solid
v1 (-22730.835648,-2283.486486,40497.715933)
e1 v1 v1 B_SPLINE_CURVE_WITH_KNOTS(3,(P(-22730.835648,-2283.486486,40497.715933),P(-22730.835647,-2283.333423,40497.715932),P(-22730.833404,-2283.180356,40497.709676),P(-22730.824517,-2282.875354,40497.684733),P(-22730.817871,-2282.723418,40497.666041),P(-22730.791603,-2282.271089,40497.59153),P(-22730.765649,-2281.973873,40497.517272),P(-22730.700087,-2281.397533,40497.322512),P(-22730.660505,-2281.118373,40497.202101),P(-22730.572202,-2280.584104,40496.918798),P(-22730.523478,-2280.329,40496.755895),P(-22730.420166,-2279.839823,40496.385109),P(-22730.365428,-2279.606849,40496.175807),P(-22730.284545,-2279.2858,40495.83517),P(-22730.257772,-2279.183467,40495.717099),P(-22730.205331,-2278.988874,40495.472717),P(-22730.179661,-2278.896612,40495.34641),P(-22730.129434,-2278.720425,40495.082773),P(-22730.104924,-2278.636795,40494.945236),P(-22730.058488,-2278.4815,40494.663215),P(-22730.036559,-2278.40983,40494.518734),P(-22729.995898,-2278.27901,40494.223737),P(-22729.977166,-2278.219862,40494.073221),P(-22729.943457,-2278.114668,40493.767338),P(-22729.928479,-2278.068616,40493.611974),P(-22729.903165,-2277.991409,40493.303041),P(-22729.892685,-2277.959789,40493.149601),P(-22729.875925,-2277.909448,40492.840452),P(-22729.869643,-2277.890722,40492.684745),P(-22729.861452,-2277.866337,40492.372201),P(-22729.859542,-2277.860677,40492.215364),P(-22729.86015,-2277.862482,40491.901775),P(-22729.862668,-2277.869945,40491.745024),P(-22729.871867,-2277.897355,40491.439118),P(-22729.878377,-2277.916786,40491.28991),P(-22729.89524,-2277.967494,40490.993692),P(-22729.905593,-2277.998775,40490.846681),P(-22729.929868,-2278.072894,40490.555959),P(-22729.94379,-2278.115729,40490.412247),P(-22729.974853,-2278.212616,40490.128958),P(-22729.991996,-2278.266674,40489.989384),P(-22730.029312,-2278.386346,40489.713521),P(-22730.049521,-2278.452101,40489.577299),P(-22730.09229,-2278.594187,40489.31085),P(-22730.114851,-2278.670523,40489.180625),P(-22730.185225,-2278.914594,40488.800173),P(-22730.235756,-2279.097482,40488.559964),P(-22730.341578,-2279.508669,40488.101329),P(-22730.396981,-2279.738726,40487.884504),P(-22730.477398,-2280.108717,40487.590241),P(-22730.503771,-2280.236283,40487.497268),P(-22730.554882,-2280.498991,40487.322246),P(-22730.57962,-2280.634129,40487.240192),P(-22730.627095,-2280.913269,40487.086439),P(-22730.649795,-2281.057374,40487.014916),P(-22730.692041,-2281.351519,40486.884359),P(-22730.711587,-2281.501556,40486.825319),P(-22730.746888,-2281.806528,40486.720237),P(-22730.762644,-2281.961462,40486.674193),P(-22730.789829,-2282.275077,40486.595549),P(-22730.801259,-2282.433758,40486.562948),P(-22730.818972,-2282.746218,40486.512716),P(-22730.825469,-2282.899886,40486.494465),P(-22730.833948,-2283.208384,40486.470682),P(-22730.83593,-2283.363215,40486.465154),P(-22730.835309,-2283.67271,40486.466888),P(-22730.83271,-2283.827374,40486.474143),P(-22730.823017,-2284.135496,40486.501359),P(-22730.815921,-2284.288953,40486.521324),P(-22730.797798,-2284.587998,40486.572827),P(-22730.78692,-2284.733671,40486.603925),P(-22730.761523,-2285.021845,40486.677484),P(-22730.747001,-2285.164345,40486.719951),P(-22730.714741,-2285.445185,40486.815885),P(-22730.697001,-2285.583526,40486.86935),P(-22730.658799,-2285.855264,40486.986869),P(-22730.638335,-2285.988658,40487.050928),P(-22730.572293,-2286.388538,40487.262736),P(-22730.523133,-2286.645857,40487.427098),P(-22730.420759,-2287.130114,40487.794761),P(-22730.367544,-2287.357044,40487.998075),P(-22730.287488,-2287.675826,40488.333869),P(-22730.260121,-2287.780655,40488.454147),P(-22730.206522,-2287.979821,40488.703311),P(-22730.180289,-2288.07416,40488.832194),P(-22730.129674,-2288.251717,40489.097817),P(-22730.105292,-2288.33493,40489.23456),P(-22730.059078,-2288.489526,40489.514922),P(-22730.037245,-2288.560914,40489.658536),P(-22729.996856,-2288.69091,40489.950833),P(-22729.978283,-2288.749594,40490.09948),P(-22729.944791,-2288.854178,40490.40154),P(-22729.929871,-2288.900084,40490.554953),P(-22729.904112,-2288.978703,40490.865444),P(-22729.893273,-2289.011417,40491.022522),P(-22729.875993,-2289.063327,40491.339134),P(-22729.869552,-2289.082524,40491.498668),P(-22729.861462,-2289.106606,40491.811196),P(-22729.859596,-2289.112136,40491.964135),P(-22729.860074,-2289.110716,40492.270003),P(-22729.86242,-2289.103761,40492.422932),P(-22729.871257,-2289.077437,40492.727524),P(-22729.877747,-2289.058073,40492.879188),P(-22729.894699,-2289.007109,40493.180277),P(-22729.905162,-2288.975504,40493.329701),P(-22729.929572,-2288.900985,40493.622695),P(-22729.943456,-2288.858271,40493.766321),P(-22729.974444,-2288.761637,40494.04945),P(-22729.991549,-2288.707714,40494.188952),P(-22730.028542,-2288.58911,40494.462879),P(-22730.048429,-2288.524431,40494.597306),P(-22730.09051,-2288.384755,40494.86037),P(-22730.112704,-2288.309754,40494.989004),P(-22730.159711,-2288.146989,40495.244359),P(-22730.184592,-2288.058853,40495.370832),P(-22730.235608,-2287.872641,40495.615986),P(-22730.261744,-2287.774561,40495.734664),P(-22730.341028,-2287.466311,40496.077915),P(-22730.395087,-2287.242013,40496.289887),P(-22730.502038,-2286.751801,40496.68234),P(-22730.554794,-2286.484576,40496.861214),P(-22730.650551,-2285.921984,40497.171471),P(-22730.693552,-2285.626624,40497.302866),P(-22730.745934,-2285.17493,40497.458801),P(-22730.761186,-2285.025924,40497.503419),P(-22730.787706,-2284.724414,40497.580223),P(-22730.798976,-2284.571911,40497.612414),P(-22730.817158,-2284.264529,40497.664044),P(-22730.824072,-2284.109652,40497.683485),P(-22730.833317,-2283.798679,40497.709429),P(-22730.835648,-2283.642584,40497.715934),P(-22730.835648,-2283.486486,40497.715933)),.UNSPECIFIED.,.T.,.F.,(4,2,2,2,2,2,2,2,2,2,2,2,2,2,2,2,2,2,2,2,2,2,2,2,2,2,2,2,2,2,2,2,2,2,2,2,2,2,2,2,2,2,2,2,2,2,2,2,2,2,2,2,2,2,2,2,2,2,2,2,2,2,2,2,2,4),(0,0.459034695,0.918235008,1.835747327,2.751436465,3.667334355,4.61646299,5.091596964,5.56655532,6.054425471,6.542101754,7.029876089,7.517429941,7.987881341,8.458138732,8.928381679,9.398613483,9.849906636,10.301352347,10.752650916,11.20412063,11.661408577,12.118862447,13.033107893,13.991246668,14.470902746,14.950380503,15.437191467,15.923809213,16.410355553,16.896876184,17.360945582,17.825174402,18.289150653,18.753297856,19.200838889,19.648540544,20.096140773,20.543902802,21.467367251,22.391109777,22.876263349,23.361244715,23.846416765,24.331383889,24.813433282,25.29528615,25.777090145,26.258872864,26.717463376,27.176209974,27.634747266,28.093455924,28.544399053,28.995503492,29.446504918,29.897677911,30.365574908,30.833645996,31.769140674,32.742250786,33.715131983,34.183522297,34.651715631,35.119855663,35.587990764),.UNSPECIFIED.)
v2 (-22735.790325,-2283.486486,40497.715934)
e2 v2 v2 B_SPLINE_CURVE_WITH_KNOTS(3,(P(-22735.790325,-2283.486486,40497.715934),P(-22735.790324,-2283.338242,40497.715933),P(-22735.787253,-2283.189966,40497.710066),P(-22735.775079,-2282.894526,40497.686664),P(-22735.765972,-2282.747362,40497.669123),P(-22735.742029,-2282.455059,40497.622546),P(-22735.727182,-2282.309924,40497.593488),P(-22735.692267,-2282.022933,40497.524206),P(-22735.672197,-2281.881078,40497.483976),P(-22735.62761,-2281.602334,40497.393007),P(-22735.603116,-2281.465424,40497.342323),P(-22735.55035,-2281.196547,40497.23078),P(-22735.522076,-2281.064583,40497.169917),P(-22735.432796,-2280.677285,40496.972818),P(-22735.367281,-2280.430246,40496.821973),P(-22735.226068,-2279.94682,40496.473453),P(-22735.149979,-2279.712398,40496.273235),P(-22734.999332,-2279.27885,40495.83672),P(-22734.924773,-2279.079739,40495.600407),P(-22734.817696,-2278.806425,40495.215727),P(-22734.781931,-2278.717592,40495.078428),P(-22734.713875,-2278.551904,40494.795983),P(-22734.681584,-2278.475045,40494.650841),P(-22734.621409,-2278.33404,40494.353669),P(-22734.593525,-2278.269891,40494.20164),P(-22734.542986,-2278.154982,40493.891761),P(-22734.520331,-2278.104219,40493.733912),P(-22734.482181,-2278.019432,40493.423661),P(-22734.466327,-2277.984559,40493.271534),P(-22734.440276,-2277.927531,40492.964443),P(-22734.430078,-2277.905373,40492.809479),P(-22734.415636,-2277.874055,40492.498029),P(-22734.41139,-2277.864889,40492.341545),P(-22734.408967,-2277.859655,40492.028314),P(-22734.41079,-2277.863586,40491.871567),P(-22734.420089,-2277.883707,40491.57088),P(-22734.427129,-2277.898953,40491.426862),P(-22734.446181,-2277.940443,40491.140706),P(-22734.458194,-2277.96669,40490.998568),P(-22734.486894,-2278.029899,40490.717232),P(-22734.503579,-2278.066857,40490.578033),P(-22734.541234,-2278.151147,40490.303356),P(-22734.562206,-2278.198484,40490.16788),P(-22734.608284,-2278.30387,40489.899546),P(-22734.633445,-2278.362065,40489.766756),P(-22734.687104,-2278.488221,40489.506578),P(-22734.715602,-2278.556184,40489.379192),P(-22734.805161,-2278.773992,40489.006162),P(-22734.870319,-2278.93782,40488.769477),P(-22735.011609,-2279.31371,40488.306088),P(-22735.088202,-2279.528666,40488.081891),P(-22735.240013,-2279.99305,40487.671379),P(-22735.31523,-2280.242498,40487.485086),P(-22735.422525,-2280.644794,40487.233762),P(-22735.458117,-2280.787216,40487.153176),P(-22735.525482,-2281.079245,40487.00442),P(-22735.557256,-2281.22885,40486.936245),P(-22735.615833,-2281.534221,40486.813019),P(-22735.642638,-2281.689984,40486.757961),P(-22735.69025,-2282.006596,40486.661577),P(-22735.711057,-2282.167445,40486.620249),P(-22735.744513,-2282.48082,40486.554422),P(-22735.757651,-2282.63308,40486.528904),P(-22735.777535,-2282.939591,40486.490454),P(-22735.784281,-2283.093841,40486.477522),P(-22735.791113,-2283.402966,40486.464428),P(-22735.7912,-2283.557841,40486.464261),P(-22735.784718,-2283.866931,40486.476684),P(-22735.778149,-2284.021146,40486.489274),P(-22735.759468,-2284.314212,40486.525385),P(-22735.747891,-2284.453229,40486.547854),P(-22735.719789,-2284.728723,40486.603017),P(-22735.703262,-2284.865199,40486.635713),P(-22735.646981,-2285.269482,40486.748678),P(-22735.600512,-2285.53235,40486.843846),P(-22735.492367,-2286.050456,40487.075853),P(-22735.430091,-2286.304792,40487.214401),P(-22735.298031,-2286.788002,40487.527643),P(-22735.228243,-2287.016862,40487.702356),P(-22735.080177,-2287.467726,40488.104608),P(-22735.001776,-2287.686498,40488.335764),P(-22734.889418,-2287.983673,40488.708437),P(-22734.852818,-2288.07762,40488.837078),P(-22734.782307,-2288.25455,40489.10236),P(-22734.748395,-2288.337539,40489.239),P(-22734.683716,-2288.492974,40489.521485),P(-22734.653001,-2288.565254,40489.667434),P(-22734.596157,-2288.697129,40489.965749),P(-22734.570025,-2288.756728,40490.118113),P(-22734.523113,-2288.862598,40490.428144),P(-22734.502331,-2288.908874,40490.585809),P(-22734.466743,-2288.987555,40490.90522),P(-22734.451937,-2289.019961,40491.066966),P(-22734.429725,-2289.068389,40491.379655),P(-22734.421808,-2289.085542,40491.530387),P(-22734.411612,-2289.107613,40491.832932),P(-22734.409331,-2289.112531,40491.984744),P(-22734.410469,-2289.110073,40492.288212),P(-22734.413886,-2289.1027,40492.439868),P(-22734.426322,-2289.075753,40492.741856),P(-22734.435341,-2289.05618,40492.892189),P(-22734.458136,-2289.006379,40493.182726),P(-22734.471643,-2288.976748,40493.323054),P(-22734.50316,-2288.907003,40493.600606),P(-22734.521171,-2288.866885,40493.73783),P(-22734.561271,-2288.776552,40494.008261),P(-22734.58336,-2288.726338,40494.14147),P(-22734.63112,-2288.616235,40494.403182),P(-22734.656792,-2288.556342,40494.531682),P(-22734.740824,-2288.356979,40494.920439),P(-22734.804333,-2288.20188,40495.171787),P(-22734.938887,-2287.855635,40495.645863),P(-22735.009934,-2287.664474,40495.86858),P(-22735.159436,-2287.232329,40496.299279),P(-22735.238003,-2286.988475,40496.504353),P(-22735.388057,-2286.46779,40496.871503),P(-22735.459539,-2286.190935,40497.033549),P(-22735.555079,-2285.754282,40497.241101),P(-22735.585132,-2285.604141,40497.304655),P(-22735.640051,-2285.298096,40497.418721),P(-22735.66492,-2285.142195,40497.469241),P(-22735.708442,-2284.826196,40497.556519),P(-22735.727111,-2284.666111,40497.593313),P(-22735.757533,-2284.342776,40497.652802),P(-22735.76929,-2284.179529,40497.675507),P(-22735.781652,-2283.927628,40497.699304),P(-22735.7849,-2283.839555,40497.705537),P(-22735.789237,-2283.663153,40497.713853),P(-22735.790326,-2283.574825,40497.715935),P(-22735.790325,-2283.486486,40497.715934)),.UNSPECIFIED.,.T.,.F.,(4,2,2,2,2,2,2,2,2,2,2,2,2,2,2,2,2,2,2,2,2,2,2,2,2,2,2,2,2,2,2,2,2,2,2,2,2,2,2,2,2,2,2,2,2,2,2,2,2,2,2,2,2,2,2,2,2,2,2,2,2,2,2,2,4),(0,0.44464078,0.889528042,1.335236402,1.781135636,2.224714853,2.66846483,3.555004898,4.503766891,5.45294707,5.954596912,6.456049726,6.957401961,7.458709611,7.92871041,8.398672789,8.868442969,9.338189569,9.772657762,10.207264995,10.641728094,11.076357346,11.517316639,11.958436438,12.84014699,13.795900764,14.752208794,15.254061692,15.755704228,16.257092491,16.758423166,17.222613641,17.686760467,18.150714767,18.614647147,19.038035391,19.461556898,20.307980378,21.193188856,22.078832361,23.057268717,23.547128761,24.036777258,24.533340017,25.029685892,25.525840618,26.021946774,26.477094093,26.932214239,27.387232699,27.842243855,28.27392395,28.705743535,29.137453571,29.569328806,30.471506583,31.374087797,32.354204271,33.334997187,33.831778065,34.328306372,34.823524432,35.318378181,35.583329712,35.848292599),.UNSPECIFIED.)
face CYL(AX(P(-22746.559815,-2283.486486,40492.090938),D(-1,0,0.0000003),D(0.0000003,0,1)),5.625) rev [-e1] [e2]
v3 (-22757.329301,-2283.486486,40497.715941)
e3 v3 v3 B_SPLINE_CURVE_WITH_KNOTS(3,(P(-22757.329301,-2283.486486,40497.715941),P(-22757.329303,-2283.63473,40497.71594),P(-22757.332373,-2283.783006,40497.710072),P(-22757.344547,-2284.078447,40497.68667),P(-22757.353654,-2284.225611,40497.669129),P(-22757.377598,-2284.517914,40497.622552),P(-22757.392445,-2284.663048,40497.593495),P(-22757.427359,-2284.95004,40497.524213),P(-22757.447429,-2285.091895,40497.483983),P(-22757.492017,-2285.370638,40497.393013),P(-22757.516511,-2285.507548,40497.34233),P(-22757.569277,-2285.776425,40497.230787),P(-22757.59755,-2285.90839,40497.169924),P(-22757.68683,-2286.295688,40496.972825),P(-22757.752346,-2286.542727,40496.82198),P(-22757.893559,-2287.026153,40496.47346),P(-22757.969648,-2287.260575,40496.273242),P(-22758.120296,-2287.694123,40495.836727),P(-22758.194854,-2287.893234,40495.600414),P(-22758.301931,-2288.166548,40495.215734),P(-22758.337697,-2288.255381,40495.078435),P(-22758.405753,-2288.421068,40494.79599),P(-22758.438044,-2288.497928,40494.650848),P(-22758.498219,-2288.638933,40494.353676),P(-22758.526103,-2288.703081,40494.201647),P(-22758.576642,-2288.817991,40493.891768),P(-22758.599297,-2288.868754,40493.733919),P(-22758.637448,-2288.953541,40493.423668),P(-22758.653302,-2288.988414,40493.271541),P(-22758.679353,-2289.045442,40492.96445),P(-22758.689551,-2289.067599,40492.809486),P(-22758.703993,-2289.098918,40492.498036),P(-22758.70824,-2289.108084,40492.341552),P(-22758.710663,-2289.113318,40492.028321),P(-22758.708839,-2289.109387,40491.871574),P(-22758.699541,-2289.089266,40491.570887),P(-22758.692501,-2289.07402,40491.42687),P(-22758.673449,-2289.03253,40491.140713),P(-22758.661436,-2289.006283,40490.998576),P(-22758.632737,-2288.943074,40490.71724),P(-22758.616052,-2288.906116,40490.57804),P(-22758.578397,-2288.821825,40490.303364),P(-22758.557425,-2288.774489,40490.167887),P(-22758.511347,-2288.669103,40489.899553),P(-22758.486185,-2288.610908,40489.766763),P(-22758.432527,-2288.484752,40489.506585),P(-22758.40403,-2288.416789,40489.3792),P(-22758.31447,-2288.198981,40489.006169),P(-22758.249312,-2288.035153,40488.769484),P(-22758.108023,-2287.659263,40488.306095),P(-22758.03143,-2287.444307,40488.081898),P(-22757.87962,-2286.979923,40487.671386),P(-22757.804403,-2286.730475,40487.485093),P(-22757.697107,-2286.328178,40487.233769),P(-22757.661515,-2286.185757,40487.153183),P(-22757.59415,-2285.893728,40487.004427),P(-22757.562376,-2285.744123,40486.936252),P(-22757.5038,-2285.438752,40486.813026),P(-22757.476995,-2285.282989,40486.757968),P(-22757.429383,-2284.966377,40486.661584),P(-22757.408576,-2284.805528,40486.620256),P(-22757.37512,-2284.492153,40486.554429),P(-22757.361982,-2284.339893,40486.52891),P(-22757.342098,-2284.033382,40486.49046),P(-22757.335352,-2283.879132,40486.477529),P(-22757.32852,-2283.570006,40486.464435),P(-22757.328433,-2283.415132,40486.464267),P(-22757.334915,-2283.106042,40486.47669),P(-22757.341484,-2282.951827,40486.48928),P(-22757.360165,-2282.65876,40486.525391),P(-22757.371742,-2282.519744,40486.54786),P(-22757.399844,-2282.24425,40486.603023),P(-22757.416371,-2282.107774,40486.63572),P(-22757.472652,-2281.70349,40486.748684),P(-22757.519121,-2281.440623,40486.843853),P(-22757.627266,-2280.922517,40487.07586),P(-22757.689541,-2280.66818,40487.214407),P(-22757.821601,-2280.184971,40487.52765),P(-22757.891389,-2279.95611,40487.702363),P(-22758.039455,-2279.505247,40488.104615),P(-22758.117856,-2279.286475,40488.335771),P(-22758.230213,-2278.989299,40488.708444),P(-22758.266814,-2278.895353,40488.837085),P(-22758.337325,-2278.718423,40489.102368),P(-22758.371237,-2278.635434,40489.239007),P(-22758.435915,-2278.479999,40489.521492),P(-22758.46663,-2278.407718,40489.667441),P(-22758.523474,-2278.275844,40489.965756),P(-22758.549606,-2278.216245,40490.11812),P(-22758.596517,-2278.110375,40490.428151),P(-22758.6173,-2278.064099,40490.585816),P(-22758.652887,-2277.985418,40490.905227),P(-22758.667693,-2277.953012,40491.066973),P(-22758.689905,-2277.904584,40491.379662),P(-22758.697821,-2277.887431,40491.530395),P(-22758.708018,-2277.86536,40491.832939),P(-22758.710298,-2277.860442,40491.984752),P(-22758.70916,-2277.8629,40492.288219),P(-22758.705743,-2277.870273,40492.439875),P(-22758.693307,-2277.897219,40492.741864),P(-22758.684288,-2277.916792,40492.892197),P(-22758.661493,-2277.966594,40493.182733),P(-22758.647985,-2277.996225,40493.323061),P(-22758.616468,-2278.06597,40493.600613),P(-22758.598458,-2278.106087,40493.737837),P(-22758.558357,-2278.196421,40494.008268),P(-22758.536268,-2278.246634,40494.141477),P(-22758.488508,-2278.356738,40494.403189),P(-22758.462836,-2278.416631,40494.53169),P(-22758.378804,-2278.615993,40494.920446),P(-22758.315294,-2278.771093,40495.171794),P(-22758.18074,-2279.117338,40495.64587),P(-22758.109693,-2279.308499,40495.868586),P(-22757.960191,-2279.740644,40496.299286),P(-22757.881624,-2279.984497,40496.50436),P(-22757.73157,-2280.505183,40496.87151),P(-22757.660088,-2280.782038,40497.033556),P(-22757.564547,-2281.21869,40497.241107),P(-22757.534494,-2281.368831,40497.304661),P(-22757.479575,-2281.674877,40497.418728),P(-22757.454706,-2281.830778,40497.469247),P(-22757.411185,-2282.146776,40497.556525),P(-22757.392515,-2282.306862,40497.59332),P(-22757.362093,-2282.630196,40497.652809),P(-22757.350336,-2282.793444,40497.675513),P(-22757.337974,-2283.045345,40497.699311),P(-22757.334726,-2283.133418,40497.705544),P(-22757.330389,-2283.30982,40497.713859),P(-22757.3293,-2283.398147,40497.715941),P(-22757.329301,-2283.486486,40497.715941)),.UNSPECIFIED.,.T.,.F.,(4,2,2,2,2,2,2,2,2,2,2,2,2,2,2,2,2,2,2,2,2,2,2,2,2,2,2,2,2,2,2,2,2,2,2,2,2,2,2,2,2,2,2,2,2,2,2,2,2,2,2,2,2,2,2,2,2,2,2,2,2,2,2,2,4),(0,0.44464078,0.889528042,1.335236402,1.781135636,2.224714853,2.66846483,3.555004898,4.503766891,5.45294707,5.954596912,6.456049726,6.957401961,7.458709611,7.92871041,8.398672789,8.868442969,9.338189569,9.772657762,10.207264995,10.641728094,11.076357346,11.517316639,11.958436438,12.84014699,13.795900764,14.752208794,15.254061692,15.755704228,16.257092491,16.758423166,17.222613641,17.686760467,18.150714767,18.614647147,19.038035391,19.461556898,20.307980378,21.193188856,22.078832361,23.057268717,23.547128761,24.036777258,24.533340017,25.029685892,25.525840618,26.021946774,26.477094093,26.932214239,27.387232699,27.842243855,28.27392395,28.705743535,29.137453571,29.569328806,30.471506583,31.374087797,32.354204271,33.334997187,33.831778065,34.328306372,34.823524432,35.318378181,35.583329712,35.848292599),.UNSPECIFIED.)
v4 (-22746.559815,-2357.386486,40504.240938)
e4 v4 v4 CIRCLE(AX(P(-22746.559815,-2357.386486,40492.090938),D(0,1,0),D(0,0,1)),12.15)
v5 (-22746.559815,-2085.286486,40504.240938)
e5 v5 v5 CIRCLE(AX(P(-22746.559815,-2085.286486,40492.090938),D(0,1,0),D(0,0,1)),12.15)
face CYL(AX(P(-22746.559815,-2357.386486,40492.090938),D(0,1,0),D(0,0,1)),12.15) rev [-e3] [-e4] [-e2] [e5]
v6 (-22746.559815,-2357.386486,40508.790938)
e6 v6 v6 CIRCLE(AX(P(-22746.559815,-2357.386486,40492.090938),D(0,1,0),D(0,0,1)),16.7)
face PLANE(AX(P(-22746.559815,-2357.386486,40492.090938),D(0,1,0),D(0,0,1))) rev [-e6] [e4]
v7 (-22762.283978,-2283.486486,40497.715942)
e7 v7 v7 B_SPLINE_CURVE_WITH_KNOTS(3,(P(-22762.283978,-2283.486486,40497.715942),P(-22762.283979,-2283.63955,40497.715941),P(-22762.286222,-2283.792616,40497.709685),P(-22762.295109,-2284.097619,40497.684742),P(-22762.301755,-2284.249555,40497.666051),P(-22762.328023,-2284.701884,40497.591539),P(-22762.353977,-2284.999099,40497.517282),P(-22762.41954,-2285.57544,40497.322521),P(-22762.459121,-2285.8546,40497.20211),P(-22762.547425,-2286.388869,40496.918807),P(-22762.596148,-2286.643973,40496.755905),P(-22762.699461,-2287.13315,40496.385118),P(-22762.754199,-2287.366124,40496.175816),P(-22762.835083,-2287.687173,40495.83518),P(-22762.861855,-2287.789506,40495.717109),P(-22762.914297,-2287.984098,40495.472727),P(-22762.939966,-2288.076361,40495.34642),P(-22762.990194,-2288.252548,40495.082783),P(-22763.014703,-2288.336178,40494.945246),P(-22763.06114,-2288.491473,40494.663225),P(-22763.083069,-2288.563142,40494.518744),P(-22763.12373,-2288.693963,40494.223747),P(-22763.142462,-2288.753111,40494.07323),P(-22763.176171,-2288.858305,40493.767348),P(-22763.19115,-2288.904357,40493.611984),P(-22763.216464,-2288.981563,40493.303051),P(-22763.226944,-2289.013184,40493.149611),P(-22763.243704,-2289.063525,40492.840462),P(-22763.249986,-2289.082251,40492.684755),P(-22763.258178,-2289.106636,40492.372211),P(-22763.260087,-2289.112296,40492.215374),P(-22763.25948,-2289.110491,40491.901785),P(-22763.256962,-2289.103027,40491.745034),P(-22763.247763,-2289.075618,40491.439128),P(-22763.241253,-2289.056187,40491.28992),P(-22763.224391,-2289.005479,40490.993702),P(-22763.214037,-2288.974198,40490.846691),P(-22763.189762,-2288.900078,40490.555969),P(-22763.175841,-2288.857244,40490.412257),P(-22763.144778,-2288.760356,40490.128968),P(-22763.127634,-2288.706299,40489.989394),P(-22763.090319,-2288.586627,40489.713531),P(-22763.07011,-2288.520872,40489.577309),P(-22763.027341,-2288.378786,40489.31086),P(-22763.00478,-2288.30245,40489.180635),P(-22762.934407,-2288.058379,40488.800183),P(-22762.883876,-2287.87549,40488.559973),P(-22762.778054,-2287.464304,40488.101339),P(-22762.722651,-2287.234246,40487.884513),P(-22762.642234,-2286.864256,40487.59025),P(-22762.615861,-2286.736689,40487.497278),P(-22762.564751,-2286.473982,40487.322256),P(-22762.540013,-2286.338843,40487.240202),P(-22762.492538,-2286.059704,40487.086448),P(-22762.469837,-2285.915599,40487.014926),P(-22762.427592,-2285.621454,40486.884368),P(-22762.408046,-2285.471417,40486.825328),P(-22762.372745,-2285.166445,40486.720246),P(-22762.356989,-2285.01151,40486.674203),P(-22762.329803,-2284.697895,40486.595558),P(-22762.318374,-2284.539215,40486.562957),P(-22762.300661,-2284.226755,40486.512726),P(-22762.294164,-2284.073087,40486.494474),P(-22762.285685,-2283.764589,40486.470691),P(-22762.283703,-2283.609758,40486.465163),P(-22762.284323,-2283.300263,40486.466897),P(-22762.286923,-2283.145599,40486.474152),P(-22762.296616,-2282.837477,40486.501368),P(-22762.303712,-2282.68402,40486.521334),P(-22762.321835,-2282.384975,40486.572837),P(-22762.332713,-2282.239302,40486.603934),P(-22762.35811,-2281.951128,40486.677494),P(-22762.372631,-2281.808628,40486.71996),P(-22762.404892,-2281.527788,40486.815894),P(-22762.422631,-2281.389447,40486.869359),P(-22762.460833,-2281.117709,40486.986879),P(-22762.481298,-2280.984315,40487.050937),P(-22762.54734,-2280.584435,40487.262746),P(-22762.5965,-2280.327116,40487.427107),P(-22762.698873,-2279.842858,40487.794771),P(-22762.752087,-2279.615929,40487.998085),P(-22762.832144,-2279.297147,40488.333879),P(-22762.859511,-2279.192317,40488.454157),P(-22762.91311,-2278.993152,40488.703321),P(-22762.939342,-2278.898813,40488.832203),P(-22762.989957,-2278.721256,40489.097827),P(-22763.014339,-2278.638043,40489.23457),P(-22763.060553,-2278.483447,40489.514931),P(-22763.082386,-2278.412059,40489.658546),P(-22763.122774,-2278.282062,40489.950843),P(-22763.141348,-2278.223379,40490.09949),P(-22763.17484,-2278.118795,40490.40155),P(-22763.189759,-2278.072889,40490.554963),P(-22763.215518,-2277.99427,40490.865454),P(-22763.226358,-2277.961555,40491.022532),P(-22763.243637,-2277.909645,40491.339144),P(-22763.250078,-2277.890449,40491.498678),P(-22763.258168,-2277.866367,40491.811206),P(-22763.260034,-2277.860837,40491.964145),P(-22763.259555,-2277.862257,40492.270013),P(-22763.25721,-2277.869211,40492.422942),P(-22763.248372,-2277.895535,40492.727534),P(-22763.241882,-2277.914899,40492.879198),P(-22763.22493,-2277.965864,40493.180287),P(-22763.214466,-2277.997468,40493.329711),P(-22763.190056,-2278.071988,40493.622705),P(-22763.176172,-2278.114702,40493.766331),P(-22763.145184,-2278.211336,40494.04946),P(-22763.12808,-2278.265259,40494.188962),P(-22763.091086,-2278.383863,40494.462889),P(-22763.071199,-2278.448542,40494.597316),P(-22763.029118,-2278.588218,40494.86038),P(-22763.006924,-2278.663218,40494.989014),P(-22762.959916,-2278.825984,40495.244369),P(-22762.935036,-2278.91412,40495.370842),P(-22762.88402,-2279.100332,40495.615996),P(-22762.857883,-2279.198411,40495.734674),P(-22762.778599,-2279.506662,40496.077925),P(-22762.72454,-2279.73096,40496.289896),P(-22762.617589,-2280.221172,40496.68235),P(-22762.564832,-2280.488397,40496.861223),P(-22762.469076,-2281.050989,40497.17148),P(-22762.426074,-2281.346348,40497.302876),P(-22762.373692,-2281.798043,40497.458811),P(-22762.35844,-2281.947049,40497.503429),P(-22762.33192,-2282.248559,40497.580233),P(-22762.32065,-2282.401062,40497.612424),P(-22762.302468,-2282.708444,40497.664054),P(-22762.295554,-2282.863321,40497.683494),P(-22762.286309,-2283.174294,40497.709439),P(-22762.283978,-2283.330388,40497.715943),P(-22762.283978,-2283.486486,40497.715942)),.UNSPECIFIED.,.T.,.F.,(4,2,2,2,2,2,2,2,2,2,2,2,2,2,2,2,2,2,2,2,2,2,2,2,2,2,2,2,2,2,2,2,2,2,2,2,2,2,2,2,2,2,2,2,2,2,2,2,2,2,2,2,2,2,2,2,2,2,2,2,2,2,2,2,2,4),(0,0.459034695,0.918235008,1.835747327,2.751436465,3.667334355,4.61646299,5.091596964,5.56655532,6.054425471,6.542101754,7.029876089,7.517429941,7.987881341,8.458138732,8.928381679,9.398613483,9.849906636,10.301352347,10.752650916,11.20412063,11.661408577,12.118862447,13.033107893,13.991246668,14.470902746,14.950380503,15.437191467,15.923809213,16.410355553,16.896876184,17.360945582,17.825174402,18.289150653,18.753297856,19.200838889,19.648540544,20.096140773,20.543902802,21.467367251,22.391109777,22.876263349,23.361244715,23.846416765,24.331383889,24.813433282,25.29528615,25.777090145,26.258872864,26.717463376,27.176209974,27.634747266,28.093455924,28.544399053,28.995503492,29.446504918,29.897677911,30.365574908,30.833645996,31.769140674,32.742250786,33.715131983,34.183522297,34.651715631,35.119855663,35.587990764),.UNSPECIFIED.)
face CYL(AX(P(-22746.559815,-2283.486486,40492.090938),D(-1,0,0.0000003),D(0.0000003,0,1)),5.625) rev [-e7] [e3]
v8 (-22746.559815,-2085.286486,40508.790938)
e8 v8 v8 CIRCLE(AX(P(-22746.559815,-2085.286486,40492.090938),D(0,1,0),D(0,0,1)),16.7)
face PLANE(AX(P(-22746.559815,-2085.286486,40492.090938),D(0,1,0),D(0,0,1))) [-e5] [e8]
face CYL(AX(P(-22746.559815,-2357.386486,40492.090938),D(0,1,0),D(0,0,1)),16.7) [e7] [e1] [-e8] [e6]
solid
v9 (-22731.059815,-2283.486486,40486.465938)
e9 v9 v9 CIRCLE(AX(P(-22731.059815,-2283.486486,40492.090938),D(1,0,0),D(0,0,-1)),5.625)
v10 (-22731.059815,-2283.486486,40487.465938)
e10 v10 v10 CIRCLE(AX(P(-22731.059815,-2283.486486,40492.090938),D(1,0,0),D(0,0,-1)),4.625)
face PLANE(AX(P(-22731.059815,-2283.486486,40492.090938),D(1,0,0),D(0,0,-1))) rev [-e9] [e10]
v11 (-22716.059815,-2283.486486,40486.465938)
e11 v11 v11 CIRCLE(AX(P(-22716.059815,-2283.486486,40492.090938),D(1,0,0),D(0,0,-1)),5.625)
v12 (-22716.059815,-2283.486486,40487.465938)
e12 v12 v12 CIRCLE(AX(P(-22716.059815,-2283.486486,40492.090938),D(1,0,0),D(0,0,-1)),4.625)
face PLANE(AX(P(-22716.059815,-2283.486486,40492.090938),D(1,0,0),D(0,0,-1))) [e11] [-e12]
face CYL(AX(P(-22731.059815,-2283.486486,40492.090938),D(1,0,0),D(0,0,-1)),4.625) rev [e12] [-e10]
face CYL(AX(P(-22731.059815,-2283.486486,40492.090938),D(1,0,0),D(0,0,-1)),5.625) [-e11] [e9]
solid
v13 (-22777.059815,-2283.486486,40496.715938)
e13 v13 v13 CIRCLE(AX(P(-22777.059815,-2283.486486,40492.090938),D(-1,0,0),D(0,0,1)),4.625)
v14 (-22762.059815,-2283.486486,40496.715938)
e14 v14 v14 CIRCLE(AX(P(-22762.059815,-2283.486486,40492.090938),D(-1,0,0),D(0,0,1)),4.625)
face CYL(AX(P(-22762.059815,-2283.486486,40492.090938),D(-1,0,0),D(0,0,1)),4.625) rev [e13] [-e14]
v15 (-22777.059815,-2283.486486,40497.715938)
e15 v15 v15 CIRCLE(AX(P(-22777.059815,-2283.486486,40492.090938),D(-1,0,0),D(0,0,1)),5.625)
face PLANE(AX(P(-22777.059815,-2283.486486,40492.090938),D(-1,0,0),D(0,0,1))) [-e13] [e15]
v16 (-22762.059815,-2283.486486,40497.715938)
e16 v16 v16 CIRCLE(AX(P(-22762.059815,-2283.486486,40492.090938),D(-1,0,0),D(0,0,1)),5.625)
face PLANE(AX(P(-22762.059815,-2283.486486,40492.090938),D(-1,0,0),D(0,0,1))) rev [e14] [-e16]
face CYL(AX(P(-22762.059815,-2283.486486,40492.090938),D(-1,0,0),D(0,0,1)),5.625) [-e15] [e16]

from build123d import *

# Parameters (mm, degrees)
SWEEP_THIN1_PROFILE_R   = 16.7
SWEEP_THIN1_PROFILE_R_2 = 12.15
CUT_EXTRUDE1_START      = -22763.271956421
CUT_EXTRUDE1_OUTLINE_R  = 5.625
CUT_EXTRUDE1_DEPTH      = 33.400000142
SWEEP_THIN4_PROFILE_R   = 5.625
SWEEP_THIN4_PROFILE_R_2 = 4.625
CIRPATTERN2_COUNT       = 2


# Read off the part's stored shape, not the designer's step: Cut-Extrude1
with BuildPart() as part:
    # Sweep-Thin1: sweep along a curve in space
    with BuildLine() as sweep_thin1_path:
        Line((-22746.559814756, -2357.386486381, 40492.090937525), (-22746.559814756, -2085.286486381, 40492.090937525))
    # Sweep-Thin1 profile (on start of the path) → Sweep-Thin1 (sweep)
    with BuildSketch(Plane(origin=(-22746.559814756, -2357.386486381, 40492.090937525), x_dir=(0, 0, 1), z_dir=(0, 1, 0))):
        Circle(SWEEP_THIN1_PROFILE_R)
        Circle(SWEEP_THIN1_PROFILE_R_2, mode=Mode.SUBTRACT)
    sweep(path=sweep_thin1_path.line)

    # Cut-Extrude1 outline → Cut-Extrude1 (cut)
    with BuildSketch(Plane(origin=(0, 0, 0), x_dir=(0, 1, 0), z_dir=(0.999999999999955, 0, -2.9985101835401e-07)).offset(CUT_EXTRUDE1_START)):
        with Locations((-2283.486486381, 40492.084116944)):
            Circle(CUT_EXTRUDE1_OUTLINE_R)
    extrude(amount=CUT_EXTRUDE1_DEPTH, mode=Mode.SUBTRACT)


with BuildPart() as body_2:
    # Sweep-Thin4: sweep along a curve in space
    with BuildLine() as sweep_thin4_path:
        Line((-22731.059814756, -2283.486486381, 40492.090937525), (-22716.059814756, -2283.486486381, 40492.090937525))
    # Sweep-Thin4 profile (on start of the path) → Sweep-Thin4 (sweep)
    with BuildSketch(Plane(origin=(-22731.059814756, -2283.486486381, 40492.090937525), x_dir=(0, 0, 1), z_dir=(1, 0, 0))):
        Circle(SWEEP_THIN4_PROFILE_R)
        Circle(SWEEP_THIN4_PROFILE_R_2, mode=Mode.SUBTRACT)
    sweep(path=sweep_thin4_path.line)


with BuildPart() as cirpattern2_1:
    # CirPattern2: pattern copy
    add(body_2.part.rotate(Axis((-22746.559814756, 0, 40492.090937525), (0, 1, 0)), 1 * 360 / CIRPATTERN2_COUNT))


solid = Compound([part.part, body_2.part, cirpattern2_1.part])
